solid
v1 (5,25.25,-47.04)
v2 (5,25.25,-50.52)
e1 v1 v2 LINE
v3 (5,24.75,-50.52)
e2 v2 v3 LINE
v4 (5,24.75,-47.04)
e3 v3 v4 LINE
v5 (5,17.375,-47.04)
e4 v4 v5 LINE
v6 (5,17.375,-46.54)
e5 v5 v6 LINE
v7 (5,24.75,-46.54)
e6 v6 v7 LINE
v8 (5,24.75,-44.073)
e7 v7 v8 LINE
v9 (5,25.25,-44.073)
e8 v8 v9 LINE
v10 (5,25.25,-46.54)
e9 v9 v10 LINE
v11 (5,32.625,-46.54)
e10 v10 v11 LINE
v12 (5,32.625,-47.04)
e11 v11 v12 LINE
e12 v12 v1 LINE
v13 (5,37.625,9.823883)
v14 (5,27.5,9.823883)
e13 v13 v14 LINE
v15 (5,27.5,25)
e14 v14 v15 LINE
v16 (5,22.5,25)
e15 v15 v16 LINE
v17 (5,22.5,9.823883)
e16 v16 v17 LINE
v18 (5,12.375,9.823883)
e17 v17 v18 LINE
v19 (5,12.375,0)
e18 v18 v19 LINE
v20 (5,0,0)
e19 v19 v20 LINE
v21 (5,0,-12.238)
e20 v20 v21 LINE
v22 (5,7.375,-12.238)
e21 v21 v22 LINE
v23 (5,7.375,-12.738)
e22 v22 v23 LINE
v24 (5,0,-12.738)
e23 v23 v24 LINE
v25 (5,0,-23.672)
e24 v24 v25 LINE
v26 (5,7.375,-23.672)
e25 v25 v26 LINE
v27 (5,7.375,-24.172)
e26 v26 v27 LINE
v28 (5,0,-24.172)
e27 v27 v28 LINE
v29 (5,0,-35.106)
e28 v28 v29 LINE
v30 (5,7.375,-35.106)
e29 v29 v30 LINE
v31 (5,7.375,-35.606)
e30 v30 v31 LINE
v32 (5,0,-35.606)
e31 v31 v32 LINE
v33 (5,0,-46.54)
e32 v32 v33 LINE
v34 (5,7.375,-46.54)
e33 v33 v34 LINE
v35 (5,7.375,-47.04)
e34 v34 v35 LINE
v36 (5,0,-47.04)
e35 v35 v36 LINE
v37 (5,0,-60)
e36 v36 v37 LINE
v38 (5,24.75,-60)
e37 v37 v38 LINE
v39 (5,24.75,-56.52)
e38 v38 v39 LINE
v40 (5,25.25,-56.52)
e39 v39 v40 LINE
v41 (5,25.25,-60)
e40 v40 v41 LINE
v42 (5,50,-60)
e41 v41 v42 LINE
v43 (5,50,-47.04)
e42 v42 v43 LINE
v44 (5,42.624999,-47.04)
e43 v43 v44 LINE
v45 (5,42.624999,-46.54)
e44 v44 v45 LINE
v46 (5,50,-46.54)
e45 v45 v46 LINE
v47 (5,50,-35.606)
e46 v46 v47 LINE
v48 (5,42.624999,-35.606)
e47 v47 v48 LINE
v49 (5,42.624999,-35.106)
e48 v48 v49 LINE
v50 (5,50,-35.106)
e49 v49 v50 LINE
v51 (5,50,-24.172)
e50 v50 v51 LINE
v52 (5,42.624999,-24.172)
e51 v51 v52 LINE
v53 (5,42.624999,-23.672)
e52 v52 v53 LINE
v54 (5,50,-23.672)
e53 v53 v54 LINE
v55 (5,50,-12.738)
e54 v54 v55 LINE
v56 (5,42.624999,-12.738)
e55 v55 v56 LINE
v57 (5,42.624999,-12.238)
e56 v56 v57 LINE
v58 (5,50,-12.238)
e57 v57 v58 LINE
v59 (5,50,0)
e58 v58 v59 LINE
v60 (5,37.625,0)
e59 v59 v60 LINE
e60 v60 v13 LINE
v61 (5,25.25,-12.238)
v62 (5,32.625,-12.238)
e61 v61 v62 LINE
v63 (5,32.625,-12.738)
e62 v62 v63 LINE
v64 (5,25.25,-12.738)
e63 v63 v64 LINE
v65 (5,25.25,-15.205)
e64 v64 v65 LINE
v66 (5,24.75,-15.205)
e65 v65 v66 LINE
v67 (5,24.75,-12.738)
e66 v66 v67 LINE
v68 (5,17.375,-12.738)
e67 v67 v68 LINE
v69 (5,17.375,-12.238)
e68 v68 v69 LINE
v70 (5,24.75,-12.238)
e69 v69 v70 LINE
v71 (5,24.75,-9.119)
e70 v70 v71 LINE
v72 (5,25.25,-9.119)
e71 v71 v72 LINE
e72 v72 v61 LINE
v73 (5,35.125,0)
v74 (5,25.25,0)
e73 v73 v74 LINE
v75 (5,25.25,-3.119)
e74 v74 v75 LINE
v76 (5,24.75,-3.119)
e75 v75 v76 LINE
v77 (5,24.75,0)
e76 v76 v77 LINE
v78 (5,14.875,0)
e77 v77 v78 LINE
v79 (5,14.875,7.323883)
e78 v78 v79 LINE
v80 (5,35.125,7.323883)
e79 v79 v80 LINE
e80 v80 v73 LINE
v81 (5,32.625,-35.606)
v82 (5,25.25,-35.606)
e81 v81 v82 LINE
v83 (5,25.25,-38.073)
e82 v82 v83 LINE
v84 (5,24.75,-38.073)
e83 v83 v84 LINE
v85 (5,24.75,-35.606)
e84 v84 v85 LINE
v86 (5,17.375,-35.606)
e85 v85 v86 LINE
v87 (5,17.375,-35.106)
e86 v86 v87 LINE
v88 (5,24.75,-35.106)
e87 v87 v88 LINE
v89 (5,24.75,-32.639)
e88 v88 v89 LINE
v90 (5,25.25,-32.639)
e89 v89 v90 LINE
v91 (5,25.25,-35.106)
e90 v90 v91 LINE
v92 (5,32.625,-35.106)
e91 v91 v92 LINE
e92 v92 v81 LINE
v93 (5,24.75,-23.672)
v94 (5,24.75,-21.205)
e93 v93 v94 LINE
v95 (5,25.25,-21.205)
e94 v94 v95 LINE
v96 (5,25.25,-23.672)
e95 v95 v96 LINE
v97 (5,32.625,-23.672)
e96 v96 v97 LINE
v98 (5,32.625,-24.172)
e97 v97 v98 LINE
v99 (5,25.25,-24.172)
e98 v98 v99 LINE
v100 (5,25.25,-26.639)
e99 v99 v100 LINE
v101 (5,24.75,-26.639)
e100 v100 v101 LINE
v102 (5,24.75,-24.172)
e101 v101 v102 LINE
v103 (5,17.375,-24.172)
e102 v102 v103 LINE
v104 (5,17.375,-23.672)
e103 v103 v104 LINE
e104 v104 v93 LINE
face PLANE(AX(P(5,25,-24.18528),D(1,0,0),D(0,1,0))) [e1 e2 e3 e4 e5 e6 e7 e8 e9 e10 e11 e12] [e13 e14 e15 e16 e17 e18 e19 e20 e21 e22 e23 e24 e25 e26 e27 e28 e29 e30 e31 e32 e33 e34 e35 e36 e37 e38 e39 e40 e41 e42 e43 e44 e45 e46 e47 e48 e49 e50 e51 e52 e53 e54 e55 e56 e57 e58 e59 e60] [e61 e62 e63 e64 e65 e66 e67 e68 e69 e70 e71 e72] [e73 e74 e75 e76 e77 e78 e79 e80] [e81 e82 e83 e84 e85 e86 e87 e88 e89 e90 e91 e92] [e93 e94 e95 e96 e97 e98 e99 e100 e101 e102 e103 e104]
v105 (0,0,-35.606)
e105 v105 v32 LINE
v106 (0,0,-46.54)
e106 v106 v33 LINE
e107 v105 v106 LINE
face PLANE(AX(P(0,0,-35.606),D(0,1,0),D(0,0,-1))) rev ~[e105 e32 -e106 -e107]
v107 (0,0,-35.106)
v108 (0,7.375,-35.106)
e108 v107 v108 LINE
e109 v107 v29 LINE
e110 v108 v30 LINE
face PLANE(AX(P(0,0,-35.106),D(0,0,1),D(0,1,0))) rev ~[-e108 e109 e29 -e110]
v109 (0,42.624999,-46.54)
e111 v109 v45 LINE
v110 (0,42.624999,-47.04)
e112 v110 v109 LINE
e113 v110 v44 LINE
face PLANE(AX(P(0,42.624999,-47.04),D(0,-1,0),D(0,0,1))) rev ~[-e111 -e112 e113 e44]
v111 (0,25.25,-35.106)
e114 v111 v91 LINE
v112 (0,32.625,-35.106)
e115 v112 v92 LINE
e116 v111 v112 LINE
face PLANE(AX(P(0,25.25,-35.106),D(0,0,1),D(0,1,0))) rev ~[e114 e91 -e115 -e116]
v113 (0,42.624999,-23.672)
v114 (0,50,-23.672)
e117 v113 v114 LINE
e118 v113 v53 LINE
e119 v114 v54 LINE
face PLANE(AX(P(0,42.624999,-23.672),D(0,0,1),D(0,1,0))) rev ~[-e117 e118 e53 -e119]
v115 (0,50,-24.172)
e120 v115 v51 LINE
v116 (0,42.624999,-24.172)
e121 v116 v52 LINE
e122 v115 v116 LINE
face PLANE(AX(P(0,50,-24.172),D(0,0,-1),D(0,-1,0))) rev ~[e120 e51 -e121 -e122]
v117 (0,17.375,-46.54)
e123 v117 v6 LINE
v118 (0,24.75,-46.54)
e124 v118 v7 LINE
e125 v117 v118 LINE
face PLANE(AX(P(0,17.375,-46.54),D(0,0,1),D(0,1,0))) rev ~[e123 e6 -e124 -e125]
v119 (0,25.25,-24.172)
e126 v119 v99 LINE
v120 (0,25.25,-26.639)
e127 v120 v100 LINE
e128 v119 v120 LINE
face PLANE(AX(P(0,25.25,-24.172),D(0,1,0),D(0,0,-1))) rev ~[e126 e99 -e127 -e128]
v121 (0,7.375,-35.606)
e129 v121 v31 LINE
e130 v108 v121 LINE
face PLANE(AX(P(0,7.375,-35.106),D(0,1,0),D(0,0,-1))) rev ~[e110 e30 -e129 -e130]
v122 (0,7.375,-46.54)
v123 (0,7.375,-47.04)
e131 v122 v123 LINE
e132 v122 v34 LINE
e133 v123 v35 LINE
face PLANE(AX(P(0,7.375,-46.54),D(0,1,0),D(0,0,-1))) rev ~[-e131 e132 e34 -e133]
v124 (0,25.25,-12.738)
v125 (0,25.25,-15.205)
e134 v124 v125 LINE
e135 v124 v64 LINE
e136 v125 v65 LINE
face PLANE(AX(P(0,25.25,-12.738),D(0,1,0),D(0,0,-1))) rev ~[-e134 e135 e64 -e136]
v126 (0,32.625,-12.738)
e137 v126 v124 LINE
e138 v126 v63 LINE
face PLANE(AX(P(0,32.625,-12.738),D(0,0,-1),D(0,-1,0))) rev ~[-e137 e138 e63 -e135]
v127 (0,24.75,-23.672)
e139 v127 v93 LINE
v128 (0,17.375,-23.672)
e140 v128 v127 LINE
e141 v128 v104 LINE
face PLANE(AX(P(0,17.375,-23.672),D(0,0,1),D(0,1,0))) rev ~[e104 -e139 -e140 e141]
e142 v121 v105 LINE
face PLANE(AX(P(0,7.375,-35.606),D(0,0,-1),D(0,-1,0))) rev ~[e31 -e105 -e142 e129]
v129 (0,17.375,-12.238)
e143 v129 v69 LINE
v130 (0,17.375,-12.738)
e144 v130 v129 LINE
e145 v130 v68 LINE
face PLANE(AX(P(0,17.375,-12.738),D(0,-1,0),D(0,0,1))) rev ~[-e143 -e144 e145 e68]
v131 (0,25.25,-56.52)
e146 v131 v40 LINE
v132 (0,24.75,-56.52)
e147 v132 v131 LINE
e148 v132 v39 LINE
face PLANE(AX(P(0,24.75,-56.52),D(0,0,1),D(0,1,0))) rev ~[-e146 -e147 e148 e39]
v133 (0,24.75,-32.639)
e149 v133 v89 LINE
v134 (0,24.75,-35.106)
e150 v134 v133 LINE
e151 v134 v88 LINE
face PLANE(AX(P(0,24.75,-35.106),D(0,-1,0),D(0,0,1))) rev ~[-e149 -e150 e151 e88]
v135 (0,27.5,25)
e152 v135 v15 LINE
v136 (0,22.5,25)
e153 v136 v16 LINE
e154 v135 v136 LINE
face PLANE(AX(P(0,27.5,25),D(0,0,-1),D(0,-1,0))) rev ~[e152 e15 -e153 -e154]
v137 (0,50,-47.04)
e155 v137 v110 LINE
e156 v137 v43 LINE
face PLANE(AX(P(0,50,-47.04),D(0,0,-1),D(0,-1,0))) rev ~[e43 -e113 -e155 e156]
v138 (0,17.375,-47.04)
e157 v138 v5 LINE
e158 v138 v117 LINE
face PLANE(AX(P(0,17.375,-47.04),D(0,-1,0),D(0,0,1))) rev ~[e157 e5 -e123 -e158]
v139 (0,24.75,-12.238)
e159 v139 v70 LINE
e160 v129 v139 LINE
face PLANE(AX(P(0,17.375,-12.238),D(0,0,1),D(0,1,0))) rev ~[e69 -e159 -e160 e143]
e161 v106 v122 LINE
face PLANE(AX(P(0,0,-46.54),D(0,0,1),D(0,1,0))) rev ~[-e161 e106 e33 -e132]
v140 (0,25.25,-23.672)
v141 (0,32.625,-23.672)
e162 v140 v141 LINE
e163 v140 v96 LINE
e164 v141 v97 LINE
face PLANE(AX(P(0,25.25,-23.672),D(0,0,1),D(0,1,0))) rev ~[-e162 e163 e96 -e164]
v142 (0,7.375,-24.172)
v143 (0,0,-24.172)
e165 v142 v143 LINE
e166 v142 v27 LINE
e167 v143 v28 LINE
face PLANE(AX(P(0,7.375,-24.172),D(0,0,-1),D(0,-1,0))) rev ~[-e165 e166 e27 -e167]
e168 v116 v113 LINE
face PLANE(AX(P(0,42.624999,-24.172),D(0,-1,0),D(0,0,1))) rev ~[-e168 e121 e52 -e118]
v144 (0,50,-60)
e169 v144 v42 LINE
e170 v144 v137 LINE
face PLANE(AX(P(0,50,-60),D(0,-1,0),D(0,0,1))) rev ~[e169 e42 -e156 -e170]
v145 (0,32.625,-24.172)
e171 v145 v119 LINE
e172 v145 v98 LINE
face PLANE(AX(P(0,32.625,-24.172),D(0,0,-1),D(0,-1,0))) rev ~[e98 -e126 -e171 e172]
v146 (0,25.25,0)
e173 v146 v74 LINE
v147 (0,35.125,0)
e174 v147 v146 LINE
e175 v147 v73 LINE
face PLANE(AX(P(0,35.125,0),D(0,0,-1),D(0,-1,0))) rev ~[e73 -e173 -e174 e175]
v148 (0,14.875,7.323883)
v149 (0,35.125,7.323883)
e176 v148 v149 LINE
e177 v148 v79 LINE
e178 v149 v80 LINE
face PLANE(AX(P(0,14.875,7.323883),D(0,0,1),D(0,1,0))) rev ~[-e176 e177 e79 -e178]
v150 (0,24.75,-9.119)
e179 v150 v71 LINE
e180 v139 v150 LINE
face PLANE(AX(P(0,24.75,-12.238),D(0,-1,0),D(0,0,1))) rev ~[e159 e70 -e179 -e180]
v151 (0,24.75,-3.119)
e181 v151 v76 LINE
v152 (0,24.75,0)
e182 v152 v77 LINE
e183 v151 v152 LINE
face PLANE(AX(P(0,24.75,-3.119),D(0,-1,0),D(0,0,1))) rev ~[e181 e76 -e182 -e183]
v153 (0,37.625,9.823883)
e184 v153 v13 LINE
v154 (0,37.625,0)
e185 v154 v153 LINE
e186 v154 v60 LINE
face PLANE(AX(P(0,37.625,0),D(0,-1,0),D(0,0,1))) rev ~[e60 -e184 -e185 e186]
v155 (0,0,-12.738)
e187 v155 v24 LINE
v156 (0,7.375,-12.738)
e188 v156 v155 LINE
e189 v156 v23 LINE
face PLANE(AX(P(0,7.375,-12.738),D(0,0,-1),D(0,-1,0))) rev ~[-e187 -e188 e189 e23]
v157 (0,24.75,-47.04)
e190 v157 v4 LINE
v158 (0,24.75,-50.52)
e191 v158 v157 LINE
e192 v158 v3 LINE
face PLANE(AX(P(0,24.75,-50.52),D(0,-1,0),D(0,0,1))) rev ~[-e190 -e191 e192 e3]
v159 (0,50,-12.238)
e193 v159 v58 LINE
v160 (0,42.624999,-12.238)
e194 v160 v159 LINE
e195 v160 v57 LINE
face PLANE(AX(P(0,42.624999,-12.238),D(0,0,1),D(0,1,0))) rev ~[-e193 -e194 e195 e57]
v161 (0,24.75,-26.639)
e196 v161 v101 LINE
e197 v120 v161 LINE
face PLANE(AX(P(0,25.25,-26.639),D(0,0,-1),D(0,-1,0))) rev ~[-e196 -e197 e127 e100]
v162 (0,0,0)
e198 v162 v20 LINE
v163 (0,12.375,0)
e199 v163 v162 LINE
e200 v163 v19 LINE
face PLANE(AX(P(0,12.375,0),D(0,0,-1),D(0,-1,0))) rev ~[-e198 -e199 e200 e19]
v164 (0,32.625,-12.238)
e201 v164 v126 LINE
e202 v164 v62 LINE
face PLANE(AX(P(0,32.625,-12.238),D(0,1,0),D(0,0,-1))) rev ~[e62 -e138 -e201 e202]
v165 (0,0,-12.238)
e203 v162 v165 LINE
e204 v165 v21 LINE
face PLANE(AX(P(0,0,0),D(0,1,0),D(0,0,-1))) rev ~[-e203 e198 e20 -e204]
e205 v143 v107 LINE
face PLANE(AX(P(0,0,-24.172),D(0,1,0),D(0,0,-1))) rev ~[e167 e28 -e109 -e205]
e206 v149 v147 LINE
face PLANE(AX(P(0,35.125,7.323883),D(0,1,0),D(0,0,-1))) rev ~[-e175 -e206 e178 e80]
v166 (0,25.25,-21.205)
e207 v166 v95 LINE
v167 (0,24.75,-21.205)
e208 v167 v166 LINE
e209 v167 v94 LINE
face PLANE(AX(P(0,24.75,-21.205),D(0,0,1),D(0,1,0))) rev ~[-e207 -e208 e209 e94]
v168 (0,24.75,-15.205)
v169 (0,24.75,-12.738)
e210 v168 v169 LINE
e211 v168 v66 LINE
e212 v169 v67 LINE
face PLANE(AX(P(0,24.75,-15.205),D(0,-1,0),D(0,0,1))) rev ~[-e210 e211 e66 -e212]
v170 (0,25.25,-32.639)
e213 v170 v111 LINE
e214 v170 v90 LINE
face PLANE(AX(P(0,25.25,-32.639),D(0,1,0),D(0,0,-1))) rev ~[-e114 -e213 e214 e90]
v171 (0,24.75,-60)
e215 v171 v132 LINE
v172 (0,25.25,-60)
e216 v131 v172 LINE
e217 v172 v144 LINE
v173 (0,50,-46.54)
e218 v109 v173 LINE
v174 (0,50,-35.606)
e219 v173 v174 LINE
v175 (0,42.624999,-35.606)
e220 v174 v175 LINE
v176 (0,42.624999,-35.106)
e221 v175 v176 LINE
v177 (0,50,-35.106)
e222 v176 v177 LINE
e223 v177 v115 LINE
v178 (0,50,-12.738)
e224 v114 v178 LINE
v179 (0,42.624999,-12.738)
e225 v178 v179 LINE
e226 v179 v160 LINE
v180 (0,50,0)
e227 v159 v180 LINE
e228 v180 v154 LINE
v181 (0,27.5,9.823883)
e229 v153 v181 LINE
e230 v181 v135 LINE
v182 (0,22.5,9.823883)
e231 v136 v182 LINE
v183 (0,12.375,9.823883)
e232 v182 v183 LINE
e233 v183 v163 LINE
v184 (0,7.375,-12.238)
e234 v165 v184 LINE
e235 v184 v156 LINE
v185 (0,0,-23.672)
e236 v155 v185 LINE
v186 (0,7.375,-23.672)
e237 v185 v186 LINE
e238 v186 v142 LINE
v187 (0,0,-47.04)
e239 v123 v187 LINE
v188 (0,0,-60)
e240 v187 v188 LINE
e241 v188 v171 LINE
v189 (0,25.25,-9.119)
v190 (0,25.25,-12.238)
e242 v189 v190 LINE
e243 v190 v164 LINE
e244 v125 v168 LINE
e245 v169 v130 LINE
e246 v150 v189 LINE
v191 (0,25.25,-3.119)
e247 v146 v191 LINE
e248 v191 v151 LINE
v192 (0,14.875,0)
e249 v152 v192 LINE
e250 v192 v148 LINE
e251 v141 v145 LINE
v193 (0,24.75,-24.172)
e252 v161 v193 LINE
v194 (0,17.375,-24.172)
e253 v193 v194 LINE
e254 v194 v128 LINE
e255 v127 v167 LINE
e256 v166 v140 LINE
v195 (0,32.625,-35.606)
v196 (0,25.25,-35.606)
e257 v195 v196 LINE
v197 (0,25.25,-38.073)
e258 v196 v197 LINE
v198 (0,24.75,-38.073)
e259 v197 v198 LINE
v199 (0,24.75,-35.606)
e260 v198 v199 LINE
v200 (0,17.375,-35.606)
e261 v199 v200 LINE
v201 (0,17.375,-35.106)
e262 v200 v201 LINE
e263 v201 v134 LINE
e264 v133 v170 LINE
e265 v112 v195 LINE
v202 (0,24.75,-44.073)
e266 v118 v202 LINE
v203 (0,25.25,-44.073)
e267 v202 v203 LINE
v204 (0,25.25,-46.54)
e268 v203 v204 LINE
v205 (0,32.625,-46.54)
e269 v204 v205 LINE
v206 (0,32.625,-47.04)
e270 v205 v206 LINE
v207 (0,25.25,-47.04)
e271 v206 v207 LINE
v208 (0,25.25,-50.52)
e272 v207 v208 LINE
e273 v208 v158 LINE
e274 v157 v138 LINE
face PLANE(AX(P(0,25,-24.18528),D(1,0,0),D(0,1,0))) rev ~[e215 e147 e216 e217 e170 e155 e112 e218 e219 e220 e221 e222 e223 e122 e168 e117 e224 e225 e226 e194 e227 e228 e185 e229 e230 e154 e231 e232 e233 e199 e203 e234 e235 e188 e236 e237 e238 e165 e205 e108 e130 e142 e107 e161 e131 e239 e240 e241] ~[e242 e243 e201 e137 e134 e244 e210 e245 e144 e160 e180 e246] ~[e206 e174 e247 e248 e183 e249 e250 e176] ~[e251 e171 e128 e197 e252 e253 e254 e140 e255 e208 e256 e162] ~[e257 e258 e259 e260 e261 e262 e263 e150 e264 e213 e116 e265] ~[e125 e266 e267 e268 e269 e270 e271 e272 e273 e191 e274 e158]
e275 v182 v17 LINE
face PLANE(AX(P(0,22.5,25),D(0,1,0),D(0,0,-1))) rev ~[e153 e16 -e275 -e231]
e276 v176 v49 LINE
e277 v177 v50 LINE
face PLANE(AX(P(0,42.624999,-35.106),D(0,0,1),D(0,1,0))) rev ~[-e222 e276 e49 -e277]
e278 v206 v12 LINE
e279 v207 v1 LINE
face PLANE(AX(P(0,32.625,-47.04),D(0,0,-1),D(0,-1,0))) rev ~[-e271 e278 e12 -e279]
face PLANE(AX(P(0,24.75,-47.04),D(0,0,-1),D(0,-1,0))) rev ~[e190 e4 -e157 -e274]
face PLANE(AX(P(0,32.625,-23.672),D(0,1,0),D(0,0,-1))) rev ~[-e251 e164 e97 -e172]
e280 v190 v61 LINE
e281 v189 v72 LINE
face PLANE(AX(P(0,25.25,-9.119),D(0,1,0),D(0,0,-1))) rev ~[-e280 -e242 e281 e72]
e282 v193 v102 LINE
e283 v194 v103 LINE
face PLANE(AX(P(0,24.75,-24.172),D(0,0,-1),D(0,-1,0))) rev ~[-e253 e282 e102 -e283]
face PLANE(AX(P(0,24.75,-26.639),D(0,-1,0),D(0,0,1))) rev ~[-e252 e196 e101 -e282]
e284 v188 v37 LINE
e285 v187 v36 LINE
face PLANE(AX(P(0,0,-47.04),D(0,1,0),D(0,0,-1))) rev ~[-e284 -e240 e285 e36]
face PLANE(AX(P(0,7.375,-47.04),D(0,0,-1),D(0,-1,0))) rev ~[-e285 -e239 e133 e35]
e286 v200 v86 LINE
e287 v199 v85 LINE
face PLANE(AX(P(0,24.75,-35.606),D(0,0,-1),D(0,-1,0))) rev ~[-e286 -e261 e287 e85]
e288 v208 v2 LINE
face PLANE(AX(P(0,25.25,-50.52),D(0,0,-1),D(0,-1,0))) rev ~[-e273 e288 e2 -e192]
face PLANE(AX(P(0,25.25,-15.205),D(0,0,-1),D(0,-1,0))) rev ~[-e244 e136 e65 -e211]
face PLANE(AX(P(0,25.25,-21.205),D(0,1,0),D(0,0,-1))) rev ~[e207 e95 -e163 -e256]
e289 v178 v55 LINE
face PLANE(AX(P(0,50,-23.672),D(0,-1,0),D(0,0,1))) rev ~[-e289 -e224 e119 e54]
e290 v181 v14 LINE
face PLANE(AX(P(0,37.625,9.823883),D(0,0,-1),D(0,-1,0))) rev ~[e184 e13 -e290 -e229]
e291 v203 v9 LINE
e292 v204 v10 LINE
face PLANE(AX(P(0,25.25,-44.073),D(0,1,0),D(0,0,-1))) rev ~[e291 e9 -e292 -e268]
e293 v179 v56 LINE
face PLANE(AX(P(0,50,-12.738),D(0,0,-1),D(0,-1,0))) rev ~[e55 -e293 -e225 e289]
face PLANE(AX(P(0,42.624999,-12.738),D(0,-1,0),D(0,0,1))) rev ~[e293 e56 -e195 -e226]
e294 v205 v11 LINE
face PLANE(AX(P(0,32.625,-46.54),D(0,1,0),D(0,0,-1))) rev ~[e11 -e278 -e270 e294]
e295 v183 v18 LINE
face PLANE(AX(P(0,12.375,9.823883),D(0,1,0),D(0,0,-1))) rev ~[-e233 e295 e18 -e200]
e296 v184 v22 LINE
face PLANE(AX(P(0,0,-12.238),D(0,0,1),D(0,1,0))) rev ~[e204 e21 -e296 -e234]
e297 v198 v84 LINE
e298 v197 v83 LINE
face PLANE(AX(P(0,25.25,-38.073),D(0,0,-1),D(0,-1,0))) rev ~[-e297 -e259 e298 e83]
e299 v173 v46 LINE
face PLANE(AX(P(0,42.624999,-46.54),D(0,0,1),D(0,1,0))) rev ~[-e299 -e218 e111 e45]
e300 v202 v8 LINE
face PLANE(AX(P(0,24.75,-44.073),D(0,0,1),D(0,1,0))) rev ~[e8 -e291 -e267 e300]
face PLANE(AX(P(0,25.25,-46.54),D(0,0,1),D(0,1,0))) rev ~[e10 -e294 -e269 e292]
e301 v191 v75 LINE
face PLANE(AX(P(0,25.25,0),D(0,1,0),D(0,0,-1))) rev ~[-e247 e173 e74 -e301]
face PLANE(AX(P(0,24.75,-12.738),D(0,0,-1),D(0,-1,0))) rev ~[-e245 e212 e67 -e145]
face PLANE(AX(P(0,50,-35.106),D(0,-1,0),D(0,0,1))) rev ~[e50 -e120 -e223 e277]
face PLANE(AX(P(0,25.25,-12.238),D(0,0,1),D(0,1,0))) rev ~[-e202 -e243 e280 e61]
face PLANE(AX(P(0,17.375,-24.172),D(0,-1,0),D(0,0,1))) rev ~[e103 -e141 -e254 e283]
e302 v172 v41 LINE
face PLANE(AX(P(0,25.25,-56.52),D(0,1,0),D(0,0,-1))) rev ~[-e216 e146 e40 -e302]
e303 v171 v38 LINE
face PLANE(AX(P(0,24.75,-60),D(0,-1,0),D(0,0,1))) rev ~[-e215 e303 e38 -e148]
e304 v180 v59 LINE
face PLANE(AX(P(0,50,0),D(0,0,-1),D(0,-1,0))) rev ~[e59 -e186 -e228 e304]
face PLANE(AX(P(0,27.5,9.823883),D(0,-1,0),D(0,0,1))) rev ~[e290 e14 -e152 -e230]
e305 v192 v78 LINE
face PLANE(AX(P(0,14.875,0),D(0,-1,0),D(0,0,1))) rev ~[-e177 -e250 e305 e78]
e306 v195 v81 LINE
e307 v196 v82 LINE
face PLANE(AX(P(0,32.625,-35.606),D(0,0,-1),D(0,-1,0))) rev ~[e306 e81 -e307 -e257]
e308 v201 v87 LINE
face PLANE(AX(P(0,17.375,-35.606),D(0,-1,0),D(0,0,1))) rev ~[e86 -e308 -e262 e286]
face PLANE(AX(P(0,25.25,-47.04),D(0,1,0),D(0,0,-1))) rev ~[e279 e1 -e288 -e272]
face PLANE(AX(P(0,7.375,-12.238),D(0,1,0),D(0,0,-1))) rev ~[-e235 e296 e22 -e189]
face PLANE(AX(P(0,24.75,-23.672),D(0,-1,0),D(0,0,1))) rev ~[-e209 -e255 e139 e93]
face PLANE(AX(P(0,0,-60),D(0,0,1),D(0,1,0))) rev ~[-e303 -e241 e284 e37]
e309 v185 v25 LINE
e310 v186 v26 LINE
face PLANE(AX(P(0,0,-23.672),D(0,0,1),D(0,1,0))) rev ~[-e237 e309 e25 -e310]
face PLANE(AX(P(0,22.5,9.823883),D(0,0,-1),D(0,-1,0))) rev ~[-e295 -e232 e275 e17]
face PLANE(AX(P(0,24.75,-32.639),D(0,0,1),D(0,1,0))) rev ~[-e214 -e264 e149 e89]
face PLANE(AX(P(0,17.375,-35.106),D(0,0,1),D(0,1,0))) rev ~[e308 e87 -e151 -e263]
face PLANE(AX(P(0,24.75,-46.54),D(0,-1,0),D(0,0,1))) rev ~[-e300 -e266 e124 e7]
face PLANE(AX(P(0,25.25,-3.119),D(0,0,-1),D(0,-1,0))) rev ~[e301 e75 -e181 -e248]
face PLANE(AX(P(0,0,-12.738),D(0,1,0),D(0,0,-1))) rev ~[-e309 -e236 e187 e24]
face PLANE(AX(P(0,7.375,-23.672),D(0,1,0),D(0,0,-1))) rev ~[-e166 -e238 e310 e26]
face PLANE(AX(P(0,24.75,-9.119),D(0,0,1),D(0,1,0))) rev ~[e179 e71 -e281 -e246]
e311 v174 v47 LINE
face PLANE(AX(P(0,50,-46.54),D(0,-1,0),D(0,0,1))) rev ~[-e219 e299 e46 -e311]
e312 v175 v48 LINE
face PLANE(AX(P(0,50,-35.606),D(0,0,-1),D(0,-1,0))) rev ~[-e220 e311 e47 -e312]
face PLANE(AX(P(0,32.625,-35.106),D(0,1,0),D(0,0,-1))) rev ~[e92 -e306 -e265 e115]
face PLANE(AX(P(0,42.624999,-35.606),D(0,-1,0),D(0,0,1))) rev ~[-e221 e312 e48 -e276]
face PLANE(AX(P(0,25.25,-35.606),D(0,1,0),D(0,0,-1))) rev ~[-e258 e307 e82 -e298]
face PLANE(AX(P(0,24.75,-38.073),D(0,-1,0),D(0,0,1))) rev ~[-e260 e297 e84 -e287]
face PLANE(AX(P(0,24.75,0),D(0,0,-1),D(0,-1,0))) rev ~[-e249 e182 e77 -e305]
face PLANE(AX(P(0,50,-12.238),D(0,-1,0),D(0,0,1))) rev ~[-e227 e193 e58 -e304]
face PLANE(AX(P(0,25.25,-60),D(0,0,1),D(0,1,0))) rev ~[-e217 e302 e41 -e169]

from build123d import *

# Parameters (mm, degrees)
F1_DEPTH = 5


# Not quite as in the source:
# - a feature names something its author has since deleted; it is built from what else it names


with BuildPart() as f1:
    # F0 (on Right) → F1 (new body)
    with BuildSketch(Plane.YZ):
        Polygon((12.375, 0), (0, 0), (0, -12.238), (7.3750000447, -12.238), (7.3750000447, -12.738), (0, -12.738), (0, -23.672), (7.3750000447, -23.672), (7.3750000447, -24.172), (0, -24.172), (0, -35.106), (7.3750000447, -35.106), (7.3750000447, -35.606), (0, -35.606), (0, -46.54), (7.3750000447, -46.54), (7.3750000447, -47.04), (0, -47.04), (0, -60), (24.75, -60), (24.75, -56.52), (25.25, -56.52), (25.25, -60), (50, -60), (50, -47.04), (42.6249988377, -47.04), (42.6249988377, -46.54), (50, -46.54), (50, -35.606), (42.6249988377, -35.606), (42.6249988377, -35.106), (50, -35.106), (50, -24.172), (42.6249988377, -24.172), (42.6249988377, -23.672), (50, -23.672), (50, -12.738), (42.6249988377, -12.738), (42.6249988377, -12.238), (50, -12.238), (50, 0), (37.625, 0), (37.625, 9.8238829523), (27.5, 9.8238829523), (27.5, 25), (22.5, 25), (22.5, 9.8238829523), (12.375, 9.8238829523), align=None)
        Polygon((25.25, -44.073), (25.25, -46.54), (32.625, -46.54), (32.625, -47.04), (25.25, -47.04), (25.25, -50.52), (24.75, -50.52), (24.75, -47.04), (17.375, -47.04), (17.375, -46.54), (24.75, -46.54), (24.75, -44.073), align=None, mode=Mode.SUBTRACT)
        Polygon((25.25, -32.639), (25.25, -35.106), (32.625, -35.106), (32.625, -35.606), (25.25, -35.606), (25.25, -38.073), (24.75, -38.073), (24.75, -35.606), (17.375, -35.606), (17.375, -35.106), (24.75, -35.106), (24.75, -32.639), align=None, mode=Mode.SUBTRACT)
        Polygon((25.25, -21.205), (25.25, -23.672), (32.625, -23.672), (32.625, -24.172), (25.25, -24.172), (25.25, -26.639), (24.75, -26.639), (24.75, -24.172), (17.375, -24.172), (17.375, -23.672), (24.75, -23.672), (24.75, -21.205), align=None, mode=Mode.SUBTRACT)
        Polygon((25.25, -9.119), (25.25, -12.238), (32.625, -12.238), (32.625, -12.738), (25.25, -12.738), (25.25, -15.205), (24.75, -15.205), (24.75, -12.738), (17.375, -12.738), (17.375, -12.238), (24.75, -12.238), (24.75, -9.119), align=None, mode=Mode.SUBTRACT)
        Polygon((25.25, -1.304), (25.25, -3.119), (24.75, -3.119), (24.75, 0), (14.875, 0), (14.875, 7.3238829523), (35.125, 7.3238829523), (35.125, 0), (25.25, 0), align=None, mode=Mode.SUBTRACT)
    extrude(amount=F1_DEPTH)


solid = f1.part
